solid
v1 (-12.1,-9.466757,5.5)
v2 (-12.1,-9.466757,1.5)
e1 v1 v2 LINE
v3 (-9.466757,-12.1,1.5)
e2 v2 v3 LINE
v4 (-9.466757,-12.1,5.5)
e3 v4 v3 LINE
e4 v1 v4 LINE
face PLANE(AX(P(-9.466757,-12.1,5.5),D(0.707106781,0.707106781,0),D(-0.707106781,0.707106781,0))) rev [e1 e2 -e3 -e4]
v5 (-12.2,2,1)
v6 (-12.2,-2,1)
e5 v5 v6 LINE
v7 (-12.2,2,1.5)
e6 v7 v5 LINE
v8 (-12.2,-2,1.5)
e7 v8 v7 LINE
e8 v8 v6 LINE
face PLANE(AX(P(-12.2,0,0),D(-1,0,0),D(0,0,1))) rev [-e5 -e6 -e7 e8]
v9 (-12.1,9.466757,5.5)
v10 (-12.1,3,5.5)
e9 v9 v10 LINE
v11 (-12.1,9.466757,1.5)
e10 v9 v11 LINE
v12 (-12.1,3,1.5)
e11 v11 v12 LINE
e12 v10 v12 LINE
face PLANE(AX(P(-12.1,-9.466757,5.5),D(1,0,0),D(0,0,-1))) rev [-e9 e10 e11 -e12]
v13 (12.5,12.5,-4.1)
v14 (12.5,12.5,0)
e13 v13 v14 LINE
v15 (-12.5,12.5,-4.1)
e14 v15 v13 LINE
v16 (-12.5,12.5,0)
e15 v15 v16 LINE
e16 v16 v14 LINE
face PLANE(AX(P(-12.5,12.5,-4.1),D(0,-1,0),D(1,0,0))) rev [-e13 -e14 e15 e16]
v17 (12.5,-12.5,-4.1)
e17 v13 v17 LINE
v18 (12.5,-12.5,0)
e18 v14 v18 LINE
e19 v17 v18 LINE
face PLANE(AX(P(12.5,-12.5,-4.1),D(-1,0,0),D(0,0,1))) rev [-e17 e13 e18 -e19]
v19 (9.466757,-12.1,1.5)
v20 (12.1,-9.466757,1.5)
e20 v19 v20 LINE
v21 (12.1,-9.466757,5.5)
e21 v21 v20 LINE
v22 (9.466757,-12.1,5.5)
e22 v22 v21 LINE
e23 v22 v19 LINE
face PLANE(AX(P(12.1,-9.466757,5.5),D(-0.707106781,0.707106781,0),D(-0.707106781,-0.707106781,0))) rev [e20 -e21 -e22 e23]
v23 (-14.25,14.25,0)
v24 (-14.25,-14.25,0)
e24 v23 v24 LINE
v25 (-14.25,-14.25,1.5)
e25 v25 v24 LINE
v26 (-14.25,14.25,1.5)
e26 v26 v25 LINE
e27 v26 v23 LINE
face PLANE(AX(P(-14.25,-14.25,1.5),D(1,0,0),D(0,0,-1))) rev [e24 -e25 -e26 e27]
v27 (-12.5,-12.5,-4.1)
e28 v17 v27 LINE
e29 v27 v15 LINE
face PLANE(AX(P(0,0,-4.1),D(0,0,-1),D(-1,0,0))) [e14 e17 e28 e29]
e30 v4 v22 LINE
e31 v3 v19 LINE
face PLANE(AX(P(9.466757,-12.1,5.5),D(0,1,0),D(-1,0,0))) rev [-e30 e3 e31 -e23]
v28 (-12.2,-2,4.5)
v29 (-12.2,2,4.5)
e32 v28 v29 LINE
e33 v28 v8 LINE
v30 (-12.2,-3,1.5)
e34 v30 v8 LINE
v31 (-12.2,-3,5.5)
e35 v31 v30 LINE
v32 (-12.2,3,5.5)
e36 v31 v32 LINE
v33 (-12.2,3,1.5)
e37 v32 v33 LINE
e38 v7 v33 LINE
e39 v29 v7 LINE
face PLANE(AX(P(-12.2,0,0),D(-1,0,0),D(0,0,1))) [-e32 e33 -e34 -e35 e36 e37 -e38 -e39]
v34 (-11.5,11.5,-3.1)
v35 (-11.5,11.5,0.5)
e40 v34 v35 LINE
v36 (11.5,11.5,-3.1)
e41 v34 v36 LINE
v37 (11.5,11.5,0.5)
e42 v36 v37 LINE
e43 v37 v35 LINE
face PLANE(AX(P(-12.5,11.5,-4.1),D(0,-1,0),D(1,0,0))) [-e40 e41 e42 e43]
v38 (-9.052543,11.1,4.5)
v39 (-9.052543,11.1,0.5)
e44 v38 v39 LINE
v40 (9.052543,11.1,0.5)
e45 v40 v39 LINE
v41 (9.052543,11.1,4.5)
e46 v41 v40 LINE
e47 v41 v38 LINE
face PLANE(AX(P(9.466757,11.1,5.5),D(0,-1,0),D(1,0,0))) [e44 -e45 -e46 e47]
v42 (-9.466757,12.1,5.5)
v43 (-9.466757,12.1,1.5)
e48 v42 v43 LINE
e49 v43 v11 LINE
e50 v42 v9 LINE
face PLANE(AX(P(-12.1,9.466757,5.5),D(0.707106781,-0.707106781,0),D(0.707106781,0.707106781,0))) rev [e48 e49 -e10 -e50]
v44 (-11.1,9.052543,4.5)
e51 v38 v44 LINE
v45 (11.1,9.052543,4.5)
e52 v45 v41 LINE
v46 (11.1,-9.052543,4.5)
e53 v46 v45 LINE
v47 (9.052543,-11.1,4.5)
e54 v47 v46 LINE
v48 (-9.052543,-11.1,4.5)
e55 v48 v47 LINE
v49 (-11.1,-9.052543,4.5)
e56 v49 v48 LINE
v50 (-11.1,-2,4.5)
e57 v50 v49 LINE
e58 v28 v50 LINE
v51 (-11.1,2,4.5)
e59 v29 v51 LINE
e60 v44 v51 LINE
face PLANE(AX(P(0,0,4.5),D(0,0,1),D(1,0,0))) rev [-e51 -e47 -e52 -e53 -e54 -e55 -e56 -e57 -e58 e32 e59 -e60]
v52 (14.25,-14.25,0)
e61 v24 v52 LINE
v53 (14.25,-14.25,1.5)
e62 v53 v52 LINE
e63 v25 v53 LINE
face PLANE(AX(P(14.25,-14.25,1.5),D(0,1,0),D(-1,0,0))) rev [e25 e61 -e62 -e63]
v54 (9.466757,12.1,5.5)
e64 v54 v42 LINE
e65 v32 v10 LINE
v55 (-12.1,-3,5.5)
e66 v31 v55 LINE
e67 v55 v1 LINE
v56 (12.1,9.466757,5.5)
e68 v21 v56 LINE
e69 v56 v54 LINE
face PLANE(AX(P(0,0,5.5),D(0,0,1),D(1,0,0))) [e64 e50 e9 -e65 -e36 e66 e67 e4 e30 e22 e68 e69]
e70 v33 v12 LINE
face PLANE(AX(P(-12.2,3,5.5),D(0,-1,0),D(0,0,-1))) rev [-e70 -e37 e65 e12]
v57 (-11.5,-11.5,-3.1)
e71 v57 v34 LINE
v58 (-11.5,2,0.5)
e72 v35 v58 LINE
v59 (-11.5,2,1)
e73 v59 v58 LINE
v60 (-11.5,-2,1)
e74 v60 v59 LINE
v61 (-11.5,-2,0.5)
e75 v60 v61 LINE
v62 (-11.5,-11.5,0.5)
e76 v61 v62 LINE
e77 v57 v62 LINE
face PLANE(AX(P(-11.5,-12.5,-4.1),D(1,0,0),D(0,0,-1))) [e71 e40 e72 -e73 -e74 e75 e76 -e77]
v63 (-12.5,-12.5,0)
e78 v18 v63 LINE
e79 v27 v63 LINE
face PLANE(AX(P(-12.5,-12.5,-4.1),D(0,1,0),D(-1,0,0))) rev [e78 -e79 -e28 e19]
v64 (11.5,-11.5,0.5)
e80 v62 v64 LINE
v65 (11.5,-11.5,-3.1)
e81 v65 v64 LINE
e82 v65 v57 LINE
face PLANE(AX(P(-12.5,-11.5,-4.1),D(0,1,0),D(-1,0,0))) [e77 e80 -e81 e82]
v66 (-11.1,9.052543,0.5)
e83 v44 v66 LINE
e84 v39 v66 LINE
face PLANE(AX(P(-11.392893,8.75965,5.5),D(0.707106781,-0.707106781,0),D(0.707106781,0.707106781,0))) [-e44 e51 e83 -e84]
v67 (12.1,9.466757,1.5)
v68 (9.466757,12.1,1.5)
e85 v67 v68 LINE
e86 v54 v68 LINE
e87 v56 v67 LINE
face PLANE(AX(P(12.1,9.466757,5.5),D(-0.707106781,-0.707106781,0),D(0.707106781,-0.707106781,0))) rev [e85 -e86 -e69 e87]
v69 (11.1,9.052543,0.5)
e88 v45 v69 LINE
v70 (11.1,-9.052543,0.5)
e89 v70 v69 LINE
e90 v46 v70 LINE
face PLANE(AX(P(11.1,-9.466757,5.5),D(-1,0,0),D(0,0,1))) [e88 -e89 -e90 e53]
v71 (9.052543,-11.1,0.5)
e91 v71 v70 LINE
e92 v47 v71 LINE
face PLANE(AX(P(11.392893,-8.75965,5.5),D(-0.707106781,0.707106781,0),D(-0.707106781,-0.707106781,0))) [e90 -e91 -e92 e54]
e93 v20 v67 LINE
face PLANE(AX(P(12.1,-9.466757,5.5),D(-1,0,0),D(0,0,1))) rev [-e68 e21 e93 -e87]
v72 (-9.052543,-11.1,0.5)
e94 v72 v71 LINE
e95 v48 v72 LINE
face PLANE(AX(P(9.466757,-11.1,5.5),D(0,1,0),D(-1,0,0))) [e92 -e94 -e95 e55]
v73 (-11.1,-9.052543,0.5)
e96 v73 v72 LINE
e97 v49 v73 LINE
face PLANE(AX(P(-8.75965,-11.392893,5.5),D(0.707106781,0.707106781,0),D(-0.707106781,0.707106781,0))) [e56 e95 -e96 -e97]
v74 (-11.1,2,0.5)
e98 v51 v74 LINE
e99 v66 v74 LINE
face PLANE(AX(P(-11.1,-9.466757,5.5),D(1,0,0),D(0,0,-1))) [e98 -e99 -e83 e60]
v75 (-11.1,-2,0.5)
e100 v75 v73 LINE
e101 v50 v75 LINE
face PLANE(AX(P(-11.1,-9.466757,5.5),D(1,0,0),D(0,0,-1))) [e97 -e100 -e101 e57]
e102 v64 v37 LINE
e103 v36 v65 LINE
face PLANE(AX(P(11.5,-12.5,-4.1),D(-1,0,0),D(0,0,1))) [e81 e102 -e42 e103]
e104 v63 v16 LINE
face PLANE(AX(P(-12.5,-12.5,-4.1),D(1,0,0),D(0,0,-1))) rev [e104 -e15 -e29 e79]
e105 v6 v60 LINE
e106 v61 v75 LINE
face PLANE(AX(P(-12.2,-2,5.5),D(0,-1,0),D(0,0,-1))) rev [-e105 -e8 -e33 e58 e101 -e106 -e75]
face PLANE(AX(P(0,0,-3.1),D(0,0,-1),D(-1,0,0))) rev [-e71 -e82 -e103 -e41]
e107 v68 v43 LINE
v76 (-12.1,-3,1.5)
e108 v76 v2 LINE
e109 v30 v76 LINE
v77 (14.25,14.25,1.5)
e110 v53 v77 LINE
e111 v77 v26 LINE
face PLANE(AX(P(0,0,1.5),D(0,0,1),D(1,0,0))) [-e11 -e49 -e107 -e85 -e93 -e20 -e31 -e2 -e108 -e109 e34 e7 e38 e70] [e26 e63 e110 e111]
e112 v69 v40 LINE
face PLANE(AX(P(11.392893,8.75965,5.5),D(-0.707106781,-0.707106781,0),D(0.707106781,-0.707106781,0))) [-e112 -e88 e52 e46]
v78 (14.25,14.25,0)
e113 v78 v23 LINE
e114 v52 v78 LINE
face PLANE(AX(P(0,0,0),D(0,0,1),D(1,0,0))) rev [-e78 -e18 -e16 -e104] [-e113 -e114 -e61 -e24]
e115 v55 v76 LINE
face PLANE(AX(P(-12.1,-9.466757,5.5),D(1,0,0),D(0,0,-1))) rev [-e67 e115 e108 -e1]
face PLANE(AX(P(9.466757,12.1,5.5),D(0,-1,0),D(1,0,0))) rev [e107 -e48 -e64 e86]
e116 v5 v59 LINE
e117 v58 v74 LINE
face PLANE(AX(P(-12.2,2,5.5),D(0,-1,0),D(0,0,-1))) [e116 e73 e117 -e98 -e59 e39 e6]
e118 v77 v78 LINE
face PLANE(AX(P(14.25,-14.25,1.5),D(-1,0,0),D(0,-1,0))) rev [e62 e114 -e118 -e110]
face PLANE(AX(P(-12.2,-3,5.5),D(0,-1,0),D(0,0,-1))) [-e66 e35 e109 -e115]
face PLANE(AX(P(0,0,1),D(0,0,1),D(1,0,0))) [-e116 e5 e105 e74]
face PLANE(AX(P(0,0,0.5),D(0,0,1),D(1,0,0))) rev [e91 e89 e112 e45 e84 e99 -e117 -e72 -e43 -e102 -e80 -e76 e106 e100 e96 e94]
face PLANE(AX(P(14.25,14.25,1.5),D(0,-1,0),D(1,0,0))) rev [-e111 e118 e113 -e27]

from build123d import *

# Parameters (mm, degrees)
CROQUIS1_W              = 28.5
CROQUIS1_H              = 28.5
SALIENTE_EXTRUIR1_DEPTH = 1.5
SALIENTE_EXTRUIR2_DEPTH = 4
CROQUIS3_W              = 25
CROQUIS3_H              = 25
SALIENTE_EXTRUIR3_DEPTH = 4.1
CROQUIS4_W              = 4
CROQUIS4_H              = 6
SALIENTE_EXTRUIR4_DEPTH = 0.1
VACIADO2_START          = -3.1
VACIADO2_DEPTH          = 7.6
VACIADO2_2_DEPTH        = 3.6
VACIADO2_START_2        = 1
VACIADO2_3_OUTLINE_W    = 0.7
VACIADO2_3_OUTLINE_H    = 4
VACIADO2_3_DEPTH        = 3.5


# Read off the part's stored shape, not the designer's step: Vaciado2
with BuildPart() as part:
    # Croquis1 → Saliente-Extruir1 (new body)
    with BuildSketch(Plane.XY):
        Rectangle(CROQUIS1_W, CROQUIS1_H)
    extrude(amount=SALIENTE_EXTRUIR1_DEPTH)

    # Croquis2 → Saliente-Extruir2 (add)
    with BuildSketch(Plane.XY.offset(1.5)):
        Polygon((-12.1, 9.466756826), (-9.466756826, 12.1), (9.466756826, 12.1), (12.1, 9.466756826), (12.1, -9.466756826), (9.466756826, -12.1), (-9.466756826, -12.1), (-12.1, -9.466756826), align=None)
    extrude(amount=SALIENTE_EXTRUIR2_DEPTH)

    # Croquis3 → Saliente-Extruir3 (add)
    with BuildSketch(Plane(origin=(0, 0, 0), x_dir=(-1, 0, 0), z_dir=(0, 0, -1))):
        Rectangle(CROQUIS3_W, CROQUIS3_H)
    extrude(amount=SALIENTE_EXTRUIR3_DEPTH)

    # Croquis4 → Saliente-Extruir4 (add)
    with BuildSketch(Plane.ZY.offset(12.1)):
        with Locations((3.5, 0)):
            Rectangle(CROQUIS4_W, CROQUIS4_H)
    extrude(amount=SALIENTE_EXTRUIR4_DEPTH)

    # Vaciado2 outline → Vaciado2 (cut)
    with BuildSketch(Plane.XY.offset(VACIADO2_START)):
        Polygon((-11.1, 2), (-11.5, 2), (-11.5, -2), (-11.1, -2), (-11.1, -9.052543264), (-9.052543264, -11.1), (9.052543264, -11.1), (11.1, -9.052543264), (11.1, 9.052543264), (9.052543264, 11.1), (-9.052543264, 11.1), (-11.1, 9.052543264), align=None)
    extrude(amount=VACIADO2_DEPTH, mode=Mode.SUBTRACT)

    # Vaciado2 2 outline → Vaciado2 2 (cut)
    with BuildSketch(Plane.XY.offset(VACIADO2_START)):
        Polygon((-11.5, 11.5), (-11.5, 2), (-11.1, 2), (-11.1, 9.052543264), (-9.052543264, 11.1), (9.052543264, 11.1), (11.1, 9.052543264), (11.1, -9.052543264), (9.052543264, -11.1), (-9.052543264, -11.1), (-11.1, -9.052543264), (-11.1, -2), (-11.5, -2), (-11.5, -11.5), (11.5, -11.5), (11.5, 11.5), align=None)
    extrude(amount=VACIADO2_2_DEPTH, mode=Mode.SUBTRACT)

    # Vaciado2 3 outline → Vaciado2 3 (cut)
    with BuildSketch(Plane.XY.offset(VACIADO2_START_2)):
        with Locations((-11.85, 0)):
            Rectangle(VACIADO2_3_OUTLINE_W, VACIADO2_3_OUTLINE_H)
    extrude(amount=VACIADO2_3_DEPTH, mode=Mode.SUBTRACT)


solid = part.part
